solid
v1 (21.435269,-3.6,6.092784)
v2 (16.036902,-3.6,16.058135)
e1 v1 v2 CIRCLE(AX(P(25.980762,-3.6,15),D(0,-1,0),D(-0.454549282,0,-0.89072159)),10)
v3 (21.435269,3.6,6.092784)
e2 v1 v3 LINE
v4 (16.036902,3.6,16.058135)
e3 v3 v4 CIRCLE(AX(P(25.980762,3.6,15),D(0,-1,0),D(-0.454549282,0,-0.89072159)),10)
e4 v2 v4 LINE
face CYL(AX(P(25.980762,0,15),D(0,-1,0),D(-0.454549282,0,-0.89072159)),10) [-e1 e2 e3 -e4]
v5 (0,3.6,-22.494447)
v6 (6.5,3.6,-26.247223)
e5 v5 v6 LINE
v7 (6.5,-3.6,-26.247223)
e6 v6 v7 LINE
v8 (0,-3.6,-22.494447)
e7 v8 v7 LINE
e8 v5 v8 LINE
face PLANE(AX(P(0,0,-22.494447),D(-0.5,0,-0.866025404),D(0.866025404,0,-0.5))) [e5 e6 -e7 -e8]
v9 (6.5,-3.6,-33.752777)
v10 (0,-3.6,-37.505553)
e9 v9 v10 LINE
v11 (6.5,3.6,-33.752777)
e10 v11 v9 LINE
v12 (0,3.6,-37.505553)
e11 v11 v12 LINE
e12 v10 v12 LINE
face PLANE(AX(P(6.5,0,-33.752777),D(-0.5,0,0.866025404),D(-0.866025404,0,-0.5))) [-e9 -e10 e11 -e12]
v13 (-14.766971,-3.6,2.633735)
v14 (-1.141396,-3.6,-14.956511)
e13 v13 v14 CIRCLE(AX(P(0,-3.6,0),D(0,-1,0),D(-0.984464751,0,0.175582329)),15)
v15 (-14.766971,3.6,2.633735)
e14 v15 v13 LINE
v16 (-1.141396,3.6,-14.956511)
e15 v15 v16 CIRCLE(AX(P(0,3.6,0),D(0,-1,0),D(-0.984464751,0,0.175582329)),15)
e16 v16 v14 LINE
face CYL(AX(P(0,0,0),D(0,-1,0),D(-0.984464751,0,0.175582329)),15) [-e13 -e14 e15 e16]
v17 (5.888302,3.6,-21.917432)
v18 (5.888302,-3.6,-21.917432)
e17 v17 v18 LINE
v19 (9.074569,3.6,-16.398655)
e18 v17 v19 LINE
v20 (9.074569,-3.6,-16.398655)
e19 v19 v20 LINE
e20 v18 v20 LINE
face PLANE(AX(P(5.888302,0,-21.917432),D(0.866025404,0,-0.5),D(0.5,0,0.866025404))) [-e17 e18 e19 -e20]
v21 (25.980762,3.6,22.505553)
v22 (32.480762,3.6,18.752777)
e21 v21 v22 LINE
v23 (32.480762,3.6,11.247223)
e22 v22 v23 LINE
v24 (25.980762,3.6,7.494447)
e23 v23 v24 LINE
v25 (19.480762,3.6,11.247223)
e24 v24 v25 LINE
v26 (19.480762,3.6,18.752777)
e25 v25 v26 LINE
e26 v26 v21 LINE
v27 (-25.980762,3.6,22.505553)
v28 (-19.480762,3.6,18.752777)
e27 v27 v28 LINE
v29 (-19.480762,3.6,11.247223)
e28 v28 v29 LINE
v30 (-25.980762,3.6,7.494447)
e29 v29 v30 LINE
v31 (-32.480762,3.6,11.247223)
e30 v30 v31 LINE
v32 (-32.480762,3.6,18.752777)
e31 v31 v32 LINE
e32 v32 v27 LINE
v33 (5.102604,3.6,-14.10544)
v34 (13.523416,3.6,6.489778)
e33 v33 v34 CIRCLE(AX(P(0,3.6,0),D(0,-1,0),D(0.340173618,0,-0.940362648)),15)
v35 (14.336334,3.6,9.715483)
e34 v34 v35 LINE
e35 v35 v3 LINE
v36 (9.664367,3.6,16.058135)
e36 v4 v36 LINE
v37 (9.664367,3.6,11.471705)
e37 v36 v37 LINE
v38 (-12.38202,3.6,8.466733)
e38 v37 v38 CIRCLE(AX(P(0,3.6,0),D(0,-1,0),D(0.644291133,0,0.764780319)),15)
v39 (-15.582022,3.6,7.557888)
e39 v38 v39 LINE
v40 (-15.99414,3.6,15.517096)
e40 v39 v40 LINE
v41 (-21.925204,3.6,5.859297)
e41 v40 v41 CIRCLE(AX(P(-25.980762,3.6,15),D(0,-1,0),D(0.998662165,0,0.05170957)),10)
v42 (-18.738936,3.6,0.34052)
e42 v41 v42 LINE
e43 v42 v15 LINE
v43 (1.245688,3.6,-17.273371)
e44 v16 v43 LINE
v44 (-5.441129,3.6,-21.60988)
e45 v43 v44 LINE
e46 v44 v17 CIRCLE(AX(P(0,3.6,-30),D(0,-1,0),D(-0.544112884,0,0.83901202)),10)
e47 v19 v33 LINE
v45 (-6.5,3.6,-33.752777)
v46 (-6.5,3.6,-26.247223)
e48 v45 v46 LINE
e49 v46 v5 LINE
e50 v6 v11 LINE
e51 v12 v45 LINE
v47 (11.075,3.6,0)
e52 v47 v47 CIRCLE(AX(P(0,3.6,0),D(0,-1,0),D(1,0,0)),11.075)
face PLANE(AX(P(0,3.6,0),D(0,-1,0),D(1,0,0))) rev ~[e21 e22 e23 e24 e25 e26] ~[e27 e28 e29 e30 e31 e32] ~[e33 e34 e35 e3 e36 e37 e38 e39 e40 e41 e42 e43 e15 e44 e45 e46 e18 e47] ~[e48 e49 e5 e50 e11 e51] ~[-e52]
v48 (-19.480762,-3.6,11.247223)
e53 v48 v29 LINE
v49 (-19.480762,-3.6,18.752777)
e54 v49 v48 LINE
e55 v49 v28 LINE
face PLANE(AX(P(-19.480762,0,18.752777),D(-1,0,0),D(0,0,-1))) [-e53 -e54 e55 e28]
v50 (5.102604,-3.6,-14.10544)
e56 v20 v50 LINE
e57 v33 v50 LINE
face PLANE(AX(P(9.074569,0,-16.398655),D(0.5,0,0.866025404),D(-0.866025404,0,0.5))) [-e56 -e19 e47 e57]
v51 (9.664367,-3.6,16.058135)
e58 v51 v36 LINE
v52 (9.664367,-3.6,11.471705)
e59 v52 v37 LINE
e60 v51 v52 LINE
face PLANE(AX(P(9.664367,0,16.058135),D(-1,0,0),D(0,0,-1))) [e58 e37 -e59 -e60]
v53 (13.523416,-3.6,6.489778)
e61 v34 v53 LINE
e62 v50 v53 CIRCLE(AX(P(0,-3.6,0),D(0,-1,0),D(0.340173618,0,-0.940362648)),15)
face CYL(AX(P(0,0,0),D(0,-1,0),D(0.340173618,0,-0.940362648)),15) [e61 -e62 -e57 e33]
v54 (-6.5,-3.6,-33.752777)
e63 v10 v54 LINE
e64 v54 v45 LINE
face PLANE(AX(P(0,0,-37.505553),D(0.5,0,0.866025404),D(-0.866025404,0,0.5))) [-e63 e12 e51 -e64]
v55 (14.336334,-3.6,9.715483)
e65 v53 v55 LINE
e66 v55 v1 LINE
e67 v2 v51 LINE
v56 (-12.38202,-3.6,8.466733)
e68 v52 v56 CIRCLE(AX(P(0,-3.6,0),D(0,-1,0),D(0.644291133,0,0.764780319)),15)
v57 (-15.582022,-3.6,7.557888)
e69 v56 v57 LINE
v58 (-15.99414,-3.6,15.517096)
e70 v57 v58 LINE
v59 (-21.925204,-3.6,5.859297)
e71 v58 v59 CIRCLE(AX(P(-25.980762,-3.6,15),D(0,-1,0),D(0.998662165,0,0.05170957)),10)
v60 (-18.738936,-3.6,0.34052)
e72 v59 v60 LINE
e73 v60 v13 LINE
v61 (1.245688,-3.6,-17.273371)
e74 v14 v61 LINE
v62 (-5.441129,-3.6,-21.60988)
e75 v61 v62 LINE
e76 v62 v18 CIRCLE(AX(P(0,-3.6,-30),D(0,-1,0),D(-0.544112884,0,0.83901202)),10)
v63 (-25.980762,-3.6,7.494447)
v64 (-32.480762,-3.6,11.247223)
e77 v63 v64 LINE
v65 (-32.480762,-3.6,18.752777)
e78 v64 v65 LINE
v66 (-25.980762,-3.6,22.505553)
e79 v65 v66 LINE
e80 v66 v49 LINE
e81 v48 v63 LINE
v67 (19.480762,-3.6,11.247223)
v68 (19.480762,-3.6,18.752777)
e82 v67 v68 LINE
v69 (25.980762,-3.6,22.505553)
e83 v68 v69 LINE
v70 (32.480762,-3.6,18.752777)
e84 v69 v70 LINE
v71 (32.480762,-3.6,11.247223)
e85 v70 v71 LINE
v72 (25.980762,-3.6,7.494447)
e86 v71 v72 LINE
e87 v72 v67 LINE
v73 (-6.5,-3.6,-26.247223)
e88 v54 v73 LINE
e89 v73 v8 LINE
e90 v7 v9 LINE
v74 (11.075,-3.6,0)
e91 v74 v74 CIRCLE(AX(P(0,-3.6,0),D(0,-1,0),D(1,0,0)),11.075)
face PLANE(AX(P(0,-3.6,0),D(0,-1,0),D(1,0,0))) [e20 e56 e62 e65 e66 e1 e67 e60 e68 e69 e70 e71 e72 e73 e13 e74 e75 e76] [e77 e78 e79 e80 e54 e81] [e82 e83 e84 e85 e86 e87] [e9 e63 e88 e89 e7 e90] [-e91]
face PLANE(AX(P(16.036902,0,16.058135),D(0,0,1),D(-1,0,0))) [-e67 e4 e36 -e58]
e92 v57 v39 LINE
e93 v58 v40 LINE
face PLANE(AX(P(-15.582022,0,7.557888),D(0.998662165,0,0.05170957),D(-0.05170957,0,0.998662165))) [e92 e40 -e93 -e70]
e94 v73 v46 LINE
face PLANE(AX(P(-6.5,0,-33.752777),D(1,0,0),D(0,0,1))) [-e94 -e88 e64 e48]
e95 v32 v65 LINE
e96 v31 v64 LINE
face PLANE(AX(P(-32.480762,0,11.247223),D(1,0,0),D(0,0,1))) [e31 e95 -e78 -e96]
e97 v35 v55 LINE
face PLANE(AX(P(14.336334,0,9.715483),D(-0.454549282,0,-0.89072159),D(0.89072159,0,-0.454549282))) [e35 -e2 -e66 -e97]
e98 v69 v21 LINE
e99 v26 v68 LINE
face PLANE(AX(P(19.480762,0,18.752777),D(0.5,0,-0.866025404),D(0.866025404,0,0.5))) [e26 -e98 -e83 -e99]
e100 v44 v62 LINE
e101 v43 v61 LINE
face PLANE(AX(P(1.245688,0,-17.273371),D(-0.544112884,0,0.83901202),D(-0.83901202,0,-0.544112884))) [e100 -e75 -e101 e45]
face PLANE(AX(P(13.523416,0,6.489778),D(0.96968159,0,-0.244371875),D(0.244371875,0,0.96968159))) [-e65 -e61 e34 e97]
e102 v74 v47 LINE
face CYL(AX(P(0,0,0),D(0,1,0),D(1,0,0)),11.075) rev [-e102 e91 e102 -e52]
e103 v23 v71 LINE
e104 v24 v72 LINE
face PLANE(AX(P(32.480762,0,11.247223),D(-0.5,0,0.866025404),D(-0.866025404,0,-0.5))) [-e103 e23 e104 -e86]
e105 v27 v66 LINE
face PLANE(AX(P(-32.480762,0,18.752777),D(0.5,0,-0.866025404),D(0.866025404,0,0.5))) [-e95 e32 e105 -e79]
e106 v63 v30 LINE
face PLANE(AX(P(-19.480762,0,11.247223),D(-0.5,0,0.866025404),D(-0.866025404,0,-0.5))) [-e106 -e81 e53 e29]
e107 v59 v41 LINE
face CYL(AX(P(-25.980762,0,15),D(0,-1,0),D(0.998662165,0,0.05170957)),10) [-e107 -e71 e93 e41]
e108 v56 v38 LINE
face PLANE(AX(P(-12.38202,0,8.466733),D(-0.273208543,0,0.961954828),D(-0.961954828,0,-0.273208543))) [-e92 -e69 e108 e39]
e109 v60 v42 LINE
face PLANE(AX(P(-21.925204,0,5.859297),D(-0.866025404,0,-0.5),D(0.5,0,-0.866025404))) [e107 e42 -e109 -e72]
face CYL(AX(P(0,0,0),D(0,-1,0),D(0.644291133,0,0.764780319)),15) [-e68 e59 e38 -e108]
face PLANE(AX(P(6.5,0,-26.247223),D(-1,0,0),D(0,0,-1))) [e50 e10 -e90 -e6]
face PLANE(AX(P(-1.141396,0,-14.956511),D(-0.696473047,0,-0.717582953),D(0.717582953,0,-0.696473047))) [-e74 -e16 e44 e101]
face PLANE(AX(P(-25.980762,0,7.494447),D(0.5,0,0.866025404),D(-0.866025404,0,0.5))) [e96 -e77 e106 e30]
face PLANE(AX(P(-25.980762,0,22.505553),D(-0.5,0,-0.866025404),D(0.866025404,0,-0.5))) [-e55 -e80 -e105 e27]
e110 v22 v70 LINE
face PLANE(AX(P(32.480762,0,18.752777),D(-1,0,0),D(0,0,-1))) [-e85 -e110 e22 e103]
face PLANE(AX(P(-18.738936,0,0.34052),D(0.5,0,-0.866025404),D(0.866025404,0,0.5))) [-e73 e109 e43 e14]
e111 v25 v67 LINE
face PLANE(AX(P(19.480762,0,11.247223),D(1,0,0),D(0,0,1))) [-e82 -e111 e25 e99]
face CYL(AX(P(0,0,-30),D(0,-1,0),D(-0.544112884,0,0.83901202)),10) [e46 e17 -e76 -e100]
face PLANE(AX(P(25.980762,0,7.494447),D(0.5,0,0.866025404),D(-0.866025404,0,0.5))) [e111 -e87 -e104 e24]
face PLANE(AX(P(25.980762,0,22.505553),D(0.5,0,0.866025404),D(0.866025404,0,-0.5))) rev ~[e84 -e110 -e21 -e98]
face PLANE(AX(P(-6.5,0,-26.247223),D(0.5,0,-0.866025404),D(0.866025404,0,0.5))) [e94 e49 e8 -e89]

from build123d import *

# Parameters (mm, degrees)
F0_R     = 11.075
F1_DEPTH = 3.6


# Not quite as in the source:
# - a feature of the source that left no trace in its solid (it failed there, or was rolled back) is left out


with BuildPart() as f1:
    # F0 (on Front) → F1 (new body, symmetric)
    with BuildSketch(Plane.XZ):
        with BuildLine():
            Line((-18.7389361234, 0.3405199539), (-14.7669712633, 2.6337349351))
            ThreePointArc((-14.7669712633, 2.6337349351), (-11.8584662517, -9.1856833256), (-1.1413957778, -14.9565108123))
            Line((-1.1413957778, -14.9565108123), (1.2456877462, -17.2733709451))
            Line((1.2456877462, -17.2733709451), (-5.4411288371, -21.6098797995))
            ThreePointArc((-5.4411288371, -21.6098797995), (-0.2713631395, -39.9963174243), (5.8883015494, -21.9174320378))
            Line((5.8883015494, -21.9174320378), (9.0745691311, -16.3986546997))
            Line((9.0745691311, -16.3986546997), (5.102604271, -14.1054397185))
            ThreePointArc((5.102604271, -14.1054397185), (13.8842682369, -5.6768913611), (13.5234162043, 6.4897776668))
            Line((13.5234162043, 6.4897776668), (14.3363341744, 9.7154827059))
            Line((14.3363341744, 9.7154827059), (21.4352692976, 6.0927841016))
            ThreePointArc((21.4352692976, 6.0927841016), (34.773508517, 19.7631513397), (16.0369021558, 16.0581347458))
            Line((16.0369021558, 16.0581347458), (9.6643669923, 16.0581347458))
            Line((9.6643669923, 16.0581347458), (9.6643669923, 11.4717047835))
            ThreePointArc((9.6643669923, 11.4717047835), (-2.0258019852, 14.8625746867), (-12.3820204265, 8.4667331455))
            Line((-12.3820204265, 8.4667331455), (-15.5820219205, 7.5578882392))
            Line((-15.5820219205, 7.5578882392), (-15.9941404606, 15.5170956979))
            ThreePointArc((-15.9941404606, 15.5170956979), (-34.5021453775, 20.2331660846), (-21.9252037051, 5.859297292))
            Line((-21.9252037051, 5.859297292), (-18.7389361234, 0.3405199539))
        make_face()
        Polygon((0, -22.4944465005), (6.5, -26.2472232503), (6.5, -33.7527767497), (0, -37.5055534995), (-6.5, -33.7527767497), (-6.5, -26.2472232503), align=None, mode=Mode.SUBTRACT)
        Circle(F0_R, mode=Mode.SUBTRACT)
        Polygon((-32.4807621135, 11.2472232503), (-32.4807621135, 18.7527767497), (-25.9807621135, 22.5055534995), (-19.4807621135, 18.7527767497), (-19.4807621135, 11.2472232503), (-25.9807621135, 7.4944465005), align=None, mode=Mode.SUBTRACT)
        Polygon((25.9807621135, 22.5055534995), (32.4807621135, 18.7527767497), (32.4807621135, 11.2472232503), (25.9807621135, 7.4944465005), (19.4807621135, 11.2472232503), (19.4807621135, 18.7527767497), align=None, mode=Mode.SUBTRACT)
    extrude(amount=F1_DEPTH, both=True)


solid = f1.part
